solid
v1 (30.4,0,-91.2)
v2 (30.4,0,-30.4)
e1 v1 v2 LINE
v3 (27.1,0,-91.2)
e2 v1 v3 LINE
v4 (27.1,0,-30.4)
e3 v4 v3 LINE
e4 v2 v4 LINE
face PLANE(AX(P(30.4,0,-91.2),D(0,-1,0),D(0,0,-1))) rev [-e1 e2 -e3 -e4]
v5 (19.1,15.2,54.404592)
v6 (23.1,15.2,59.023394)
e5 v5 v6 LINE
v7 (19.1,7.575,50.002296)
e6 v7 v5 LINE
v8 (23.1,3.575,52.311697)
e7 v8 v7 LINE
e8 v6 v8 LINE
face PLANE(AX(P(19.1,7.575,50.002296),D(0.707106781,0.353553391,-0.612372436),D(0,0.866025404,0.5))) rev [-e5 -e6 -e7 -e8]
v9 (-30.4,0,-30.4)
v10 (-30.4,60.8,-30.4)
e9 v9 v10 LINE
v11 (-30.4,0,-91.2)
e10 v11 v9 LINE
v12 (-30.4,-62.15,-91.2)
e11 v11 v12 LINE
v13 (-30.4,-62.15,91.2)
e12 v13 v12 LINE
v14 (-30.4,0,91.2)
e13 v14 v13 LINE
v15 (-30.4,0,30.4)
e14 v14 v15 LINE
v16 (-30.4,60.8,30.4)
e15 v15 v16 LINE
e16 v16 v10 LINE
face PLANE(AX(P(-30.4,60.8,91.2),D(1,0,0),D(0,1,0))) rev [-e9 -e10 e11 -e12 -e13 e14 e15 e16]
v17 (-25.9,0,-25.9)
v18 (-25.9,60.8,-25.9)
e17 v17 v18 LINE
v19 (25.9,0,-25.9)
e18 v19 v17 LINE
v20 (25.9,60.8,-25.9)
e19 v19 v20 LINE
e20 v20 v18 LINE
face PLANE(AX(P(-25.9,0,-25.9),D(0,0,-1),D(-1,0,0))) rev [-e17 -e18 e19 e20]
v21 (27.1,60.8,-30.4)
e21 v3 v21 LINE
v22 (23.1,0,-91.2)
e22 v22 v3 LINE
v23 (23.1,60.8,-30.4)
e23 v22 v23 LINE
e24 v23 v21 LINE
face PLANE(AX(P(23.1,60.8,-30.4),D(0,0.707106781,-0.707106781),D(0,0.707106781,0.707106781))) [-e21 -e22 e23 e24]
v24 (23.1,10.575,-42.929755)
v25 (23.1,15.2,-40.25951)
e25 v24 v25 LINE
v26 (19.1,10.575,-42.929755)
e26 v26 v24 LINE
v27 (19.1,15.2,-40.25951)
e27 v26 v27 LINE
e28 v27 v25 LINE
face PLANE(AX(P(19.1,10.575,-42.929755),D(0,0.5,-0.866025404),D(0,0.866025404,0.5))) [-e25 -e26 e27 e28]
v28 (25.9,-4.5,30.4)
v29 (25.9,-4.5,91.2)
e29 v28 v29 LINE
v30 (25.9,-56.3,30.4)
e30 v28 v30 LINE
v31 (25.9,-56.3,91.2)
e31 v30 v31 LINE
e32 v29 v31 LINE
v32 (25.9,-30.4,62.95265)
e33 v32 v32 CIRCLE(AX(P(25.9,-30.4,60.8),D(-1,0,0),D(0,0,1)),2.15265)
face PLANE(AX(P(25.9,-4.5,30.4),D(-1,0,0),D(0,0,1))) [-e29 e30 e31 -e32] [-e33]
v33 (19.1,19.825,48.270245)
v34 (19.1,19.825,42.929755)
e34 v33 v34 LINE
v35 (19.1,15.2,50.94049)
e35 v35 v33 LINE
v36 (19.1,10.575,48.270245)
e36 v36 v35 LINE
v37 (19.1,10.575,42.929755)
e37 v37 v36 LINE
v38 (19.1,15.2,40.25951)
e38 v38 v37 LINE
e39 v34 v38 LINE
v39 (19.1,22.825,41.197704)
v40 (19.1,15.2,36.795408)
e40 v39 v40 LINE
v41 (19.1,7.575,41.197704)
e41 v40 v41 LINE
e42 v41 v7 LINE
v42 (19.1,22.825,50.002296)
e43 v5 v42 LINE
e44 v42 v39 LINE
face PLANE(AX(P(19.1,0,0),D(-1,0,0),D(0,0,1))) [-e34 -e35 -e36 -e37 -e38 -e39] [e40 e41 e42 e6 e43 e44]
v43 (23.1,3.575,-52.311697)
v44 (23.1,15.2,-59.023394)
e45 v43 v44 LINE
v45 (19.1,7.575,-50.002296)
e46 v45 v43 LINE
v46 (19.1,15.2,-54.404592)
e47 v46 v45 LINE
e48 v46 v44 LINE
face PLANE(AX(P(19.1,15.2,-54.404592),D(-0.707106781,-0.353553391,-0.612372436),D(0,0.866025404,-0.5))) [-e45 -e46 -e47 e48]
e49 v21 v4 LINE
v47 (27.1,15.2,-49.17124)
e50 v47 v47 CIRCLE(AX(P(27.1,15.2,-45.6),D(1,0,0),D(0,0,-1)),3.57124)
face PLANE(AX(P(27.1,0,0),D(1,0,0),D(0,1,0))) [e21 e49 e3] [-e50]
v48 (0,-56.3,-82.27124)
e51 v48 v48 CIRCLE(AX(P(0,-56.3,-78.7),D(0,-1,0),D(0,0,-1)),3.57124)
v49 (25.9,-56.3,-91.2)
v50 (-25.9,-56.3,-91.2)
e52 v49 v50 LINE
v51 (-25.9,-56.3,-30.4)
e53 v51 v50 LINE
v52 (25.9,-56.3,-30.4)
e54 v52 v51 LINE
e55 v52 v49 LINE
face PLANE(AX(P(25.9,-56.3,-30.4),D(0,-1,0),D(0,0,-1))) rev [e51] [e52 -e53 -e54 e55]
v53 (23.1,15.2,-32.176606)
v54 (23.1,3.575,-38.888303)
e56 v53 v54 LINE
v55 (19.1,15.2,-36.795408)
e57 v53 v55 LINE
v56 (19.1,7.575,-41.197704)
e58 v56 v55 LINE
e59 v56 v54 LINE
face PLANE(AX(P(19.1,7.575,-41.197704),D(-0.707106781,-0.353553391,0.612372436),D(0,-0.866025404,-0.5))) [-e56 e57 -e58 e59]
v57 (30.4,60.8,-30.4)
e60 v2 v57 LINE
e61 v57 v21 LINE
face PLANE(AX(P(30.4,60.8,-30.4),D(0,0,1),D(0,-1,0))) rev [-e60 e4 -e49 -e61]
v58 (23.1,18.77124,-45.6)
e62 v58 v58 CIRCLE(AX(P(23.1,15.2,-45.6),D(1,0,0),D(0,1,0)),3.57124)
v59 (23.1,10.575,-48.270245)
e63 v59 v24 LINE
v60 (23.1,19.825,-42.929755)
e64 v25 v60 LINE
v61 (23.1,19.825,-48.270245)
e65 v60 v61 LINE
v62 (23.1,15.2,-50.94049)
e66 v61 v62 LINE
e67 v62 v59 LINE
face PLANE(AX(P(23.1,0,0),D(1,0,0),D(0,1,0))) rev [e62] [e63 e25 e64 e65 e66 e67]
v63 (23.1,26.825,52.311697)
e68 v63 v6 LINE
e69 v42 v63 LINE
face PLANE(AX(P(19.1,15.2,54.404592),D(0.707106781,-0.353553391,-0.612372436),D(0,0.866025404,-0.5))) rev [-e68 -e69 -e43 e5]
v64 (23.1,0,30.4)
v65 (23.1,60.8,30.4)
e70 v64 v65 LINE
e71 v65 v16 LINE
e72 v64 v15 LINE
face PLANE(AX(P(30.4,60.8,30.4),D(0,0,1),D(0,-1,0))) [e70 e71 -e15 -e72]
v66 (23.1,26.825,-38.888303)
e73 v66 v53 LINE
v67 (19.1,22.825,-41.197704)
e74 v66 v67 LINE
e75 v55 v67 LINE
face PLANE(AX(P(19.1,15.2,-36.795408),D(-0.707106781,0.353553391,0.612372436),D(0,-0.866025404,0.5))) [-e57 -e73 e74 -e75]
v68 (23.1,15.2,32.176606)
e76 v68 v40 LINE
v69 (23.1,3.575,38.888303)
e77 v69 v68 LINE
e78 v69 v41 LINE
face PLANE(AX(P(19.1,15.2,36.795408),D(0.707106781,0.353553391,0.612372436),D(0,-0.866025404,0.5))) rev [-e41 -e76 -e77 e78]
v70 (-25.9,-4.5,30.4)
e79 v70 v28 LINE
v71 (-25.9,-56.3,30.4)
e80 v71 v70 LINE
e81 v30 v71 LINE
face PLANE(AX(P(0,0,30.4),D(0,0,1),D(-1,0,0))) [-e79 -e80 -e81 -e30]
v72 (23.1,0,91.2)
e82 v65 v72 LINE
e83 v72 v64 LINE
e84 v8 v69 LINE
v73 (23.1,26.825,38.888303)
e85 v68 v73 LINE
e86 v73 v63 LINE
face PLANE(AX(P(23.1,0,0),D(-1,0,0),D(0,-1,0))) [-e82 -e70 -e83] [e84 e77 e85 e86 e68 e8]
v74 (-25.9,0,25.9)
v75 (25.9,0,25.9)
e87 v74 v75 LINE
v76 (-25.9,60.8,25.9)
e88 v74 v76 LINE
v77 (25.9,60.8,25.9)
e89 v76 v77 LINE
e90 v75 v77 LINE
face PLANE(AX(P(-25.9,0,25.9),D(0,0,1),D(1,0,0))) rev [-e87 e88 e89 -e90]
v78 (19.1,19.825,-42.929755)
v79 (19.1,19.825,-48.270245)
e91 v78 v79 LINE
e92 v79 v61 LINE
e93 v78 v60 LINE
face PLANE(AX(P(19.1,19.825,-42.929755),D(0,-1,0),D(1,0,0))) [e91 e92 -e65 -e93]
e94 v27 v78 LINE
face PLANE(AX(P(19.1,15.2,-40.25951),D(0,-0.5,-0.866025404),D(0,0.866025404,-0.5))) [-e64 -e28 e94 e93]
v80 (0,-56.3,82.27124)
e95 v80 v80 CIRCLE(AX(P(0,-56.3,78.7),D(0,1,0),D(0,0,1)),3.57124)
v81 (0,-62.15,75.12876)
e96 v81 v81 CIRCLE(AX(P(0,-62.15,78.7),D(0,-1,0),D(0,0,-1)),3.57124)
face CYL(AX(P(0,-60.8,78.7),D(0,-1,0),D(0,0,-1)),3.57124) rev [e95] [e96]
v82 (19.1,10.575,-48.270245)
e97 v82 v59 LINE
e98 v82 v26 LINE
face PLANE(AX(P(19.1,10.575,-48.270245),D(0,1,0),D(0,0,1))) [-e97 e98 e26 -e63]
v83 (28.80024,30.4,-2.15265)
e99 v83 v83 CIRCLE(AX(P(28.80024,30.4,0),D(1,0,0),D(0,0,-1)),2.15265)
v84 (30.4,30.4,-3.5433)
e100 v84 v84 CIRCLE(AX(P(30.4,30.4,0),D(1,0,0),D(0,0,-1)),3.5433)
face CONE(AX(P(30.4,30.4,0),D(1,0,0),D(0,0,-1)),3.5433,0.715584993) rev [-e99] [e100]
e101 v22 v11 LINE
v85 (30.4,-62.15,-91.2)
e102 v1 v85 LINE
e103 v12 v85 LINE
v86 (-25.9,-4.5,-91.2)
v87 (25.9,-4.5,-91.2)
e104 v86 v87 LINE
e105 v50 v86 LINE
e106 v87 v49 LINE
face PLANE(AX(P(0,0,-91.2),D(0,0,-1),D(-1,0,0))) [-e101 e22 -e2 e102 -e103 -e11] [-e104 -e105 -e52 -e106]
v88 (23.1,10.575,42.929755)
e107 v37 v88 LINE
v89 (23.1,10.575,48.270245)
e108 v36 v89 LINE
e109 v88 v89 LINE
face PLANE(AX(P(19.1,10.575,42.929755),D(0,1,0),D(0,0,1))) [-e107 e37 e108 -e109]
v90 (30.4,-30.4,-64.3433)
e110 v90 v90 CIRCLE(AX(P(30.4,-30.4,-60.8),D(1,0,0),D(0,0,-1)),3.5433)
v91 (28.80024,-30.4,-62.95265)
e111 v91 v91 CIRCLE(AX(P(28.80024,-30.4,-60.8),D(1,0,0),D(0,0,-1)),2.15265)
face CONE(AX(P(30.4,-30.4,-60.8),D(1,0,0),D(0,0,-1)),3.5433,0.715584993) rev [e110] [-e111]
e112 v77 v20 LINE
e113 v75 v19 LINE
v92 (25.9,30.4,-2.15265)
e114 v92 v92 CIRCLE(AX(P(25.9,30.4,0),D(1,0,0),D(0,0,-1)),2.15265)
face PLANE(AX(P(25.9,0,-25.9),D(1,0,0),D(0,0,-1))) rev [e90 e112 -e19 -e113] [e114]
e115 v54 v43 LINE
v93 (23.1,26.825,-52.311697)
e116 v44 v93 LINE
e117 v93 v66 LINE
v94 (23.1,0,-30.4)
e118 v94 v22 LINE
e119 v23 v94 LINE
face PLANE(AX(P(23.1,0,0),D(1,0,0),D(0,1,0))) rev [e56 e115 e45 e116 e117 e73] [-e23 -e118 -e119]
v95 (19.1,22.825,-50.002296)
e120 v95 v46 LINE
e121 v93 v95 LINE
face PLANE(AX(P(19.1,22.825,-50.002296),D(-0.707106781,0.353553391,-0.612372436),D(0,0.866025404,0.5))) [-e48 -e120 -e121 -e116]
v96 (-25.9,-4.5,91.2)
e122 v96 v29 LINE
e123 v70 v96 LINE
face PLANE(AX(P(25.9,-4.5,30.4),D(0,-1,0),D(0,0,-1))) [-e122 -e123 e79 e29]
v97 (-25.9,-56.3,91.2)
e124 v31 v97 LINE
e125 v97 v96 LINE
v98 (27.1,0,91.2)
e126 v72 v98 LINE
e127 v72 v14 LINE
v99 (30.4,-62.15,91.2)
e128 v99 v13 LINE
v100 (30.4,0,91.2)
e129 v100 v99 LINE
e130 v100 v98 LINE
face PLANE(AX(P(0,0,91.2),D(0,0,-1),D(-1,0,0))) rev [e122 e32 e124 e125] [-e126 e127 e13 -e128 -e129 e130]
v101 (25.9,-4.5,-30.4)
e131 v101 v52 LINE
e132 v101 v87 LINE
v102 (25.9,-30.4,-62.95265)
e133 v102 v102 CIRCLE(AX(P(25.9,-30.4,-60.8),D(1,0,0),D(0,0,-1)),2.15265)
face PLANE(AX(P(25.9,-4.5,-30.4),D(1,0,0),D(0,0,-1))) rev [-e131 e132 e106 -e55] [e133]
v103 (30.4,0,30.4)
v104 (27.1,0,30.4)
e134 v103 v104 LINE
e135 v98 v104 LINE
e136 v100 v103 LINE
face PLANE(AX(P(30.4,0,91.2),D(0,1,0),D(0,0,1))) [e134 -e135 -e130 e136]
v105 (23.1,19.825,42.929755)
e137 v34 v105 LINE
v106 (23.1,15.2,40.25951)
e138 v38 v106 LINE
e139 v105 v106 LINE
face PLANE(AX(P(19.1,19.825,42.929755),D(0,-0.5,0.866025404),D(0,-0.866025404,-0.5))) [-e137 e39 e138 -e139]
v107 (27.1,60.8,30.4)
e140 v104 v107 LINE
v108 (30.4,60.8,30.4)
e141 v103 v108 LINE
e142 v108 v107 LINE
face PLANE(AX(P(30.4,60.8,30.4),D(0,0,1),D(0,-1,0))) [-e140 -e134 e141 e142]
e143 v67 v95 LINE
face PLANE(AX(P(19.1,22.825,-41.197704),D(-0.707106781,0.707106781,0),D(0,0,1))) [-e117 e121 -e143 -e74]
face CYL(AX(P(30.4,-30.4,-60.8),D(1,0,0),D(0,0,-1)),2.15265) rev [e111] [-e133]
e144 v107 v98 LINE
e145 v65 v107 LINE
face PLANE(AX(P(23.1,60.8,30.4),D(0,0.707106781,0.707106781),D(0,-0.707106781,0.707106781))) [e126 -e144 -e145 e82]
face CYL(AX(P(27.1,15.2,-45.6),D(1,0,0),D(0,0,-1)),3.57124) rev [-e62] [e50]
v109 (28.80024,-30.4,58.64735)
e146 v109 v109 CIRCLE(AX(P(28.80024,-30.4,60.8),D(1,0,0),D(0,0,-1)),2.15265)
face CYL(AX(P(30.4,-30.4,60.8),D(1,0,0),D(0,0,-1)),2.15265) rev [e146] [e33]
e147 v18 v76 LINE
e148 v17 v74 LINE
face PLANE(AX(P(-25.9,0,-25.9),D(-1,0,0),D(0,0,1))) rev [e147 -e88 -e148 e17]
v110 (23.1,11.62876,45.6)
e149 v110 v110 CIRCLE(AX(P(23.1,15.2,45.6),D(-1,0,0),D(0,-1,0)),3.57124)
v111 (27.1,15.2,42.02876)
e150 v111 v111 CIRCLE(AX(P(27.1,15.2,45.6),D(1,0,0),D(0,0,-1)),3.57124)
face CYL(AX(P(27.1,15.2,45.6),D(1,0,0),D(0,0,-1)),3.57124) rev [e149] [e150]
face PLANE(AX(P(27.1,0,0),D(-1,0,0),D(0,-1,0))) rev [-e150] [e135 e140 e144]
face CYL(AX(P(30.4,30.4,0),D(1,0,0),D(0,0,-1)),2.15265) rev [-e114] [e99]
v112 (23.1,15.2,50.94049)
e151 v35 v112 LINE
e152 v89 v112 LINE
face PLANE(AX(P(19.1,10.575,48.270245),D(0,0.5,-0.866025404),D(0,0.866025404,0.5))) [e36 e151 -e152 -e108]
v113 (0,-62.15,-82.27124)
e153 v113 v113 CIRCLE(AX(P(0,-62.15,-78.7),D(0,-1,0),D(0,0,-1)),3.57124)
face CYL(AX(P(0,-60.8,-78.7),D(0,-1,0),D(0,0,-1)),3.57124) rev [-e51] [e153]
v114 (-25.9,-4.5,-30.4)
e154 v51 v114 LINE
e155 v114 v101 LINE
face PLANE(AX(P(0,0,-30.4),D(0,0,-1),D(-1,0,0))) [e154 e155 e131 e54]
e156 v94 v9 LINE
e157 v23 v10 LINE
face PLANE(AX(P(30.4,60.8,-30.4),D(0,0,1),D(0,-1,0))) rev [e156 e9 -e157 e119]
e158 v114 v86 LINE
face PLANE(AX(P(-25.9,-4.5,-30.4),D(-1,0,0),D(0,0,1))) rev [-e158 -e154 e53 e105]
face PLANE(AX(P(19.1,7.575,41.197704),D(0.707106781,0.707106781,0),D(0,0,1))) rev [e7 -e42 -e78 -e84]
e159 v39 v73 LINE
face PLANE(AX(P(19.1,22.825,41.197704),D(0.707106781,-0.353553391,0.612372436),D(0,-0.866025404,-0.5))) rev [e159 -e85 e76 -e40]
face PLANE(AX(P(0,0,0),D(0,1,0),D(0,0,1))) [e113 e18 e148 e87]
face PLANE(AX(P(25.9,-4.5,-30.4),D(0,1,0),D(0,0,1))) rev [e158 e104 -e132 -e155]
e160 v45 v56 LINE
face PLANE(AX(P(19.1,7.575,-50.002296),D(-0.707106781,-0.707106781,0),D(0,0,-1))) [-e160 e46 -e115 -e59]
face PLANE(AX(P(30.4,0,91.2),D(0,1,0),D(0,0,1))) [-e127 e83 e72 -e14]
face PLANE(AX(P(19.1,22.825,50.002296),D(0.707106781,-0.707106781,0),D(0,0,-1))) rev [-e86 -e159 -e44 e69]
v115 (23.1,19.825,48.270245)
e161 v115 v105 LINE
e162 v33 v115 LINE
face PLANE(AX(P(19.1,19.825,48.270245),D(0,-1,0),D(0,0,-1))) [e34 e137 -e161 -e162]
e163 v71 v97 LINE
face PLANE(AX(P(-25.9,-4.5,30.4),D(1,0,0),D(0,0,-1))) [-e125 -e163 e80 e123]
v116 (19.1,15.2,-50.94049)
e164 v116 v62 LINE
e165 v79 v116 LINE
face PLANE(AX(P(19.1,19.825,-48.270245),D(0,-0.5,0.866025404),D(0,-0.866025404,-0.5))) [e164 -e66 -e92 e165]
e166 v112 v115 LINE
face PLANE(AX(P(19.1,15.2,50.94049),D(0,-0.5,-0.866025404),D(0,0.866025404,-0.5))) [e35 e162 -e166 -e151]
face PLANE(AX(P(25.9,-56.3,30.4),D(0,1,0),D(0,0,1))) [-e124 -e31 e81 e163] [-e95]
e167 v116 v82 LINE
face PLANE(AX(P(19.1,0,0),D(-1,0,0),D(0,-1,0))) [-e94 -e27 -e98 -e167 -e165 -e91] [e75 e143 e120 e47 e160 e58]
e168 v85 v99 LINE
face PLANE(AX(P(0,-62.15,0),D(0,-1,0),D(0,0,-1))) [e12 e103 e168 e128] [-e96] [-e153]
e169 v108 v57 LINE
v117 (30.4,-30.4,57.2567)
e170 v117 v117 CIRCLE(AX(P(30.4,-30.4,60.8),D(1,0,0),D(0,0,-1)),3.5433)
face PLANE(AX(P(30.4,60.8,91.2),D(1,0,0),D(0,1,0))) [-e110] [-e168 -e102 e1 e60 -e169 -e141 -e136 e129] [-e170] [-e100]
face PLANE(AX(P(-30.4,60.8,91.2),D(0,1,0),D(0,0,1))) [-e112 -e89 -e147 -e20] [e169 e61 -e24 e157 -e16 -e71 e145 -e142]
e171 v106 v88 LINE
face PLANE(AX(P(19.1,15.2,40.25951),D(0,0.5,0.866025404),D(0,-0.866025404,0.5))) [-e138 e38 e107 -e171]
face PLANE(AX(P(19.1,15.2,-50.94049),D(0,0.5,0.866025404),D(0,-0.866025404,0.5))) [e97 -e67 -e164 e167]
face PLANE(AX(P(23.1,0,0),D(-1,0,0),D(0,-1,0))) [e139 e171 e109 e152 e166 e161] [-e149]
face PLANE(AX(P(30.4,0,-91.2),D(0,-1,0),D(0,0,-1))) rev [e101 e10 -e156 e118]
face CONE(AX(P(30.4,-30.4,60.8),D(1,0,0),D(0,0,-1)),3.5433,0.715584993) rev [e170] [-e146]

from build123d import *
from build123d.topology import SkipClean

# Parameters (mm, degrees)
ESQUISSE1_W                                       = 60.8
ESQUISSE1_H                                       = 121.6
BOSS_EXTRU_1_DEPTH                                = 91.2
ESQUISSE2_W                                       = 60.8
ESQUISSE2_H                                       = 60.8
ENL_V_MAT_EXTRU_1_DEPTH                           = 126.342411019
ESQUISSE3_W                                       = 51.8
ESQUISSE3_H                                       = 51.8
ENL_V_MAT_EXTRU_2_DEPTH                           = 60.8
BOSS_EXTRU_3_DEPTH                                = 4
ESQUISSE6_W                                       = 51.8
ESQUISSE6_H                                       = 51.8
ENL_V_MAT_EXTRU_3_DEPTH                           = 60.8
D_GAGEMENT_1_43_D                                 = 7.14248
FRAISAGE_POUR_VIS_T_TE_FRAIS_E_BOMB_E_D           = 4.3053
FRAISAGE_POUR_VIS_T_TE_FRAIS_E_BOMB_E_DEPTH       = 4.5
FRAISAGE_POUR_VIS_T_TE_FRAIS_E_BOMB_E_CSINK_D     = 7.0866
FRAISAGE_POUR_VIS_T_TE_FRAIS_E_BOMB_E_CSINK_ANGLE = 82
D_GAGEMENT_1_42_D                                 = 7.14248
D_GAGEMENT_1_42_DEPTH                             = 20
BOSS_EXTRU_5_DEPTH                                = 4
CHANFREIN1_SIZE                                   = 4
ESQUISSE26_W                                      = 60.8
ESQUISSE26_H                                      = 182.4
ESQUISSE26_R                                      = 3.57124
BOSS_EXTRU_7_DEPTH                                = 1.35


with BuildPart() as part:
    # Esquisse1 → Boss.-Extru.1 (new, symmetric)
    with BuildSketch(Plane.XY):
        Rectangle(ESQUISSE1_W, ESQUISSE1_H)
    extrude(amount=BOSS_EXTRU_1_DEPTH, both=True)

    # Esquisse2 → Enlèv. mat.-Extru.1 (cut, through all)
    with BuildSketch(Plane.ZY.offset(30.4)):
        with Locations((-60.8, 30.4)):
            Rectangle(ESQUISSE2_W, ESQUISSE2_H)
    enl_v_mat_extru_1 = extrude(amount=-ENL_V_MAT_EXTRU_1_DEPTH, mode=Mode.SUBTRACT)

    # Esquisse3 → Enlèv. mat.-Extru.2 (cut)
    with BuildSketch(Plane(origin=(0, 0, -91.2), x_dir=(-1, 0, 0), z_dir=(0, 0, -1))):
        with Locations((0, -30.4)):
            Rectangle(ESQUISSE3_W, ESQUISSE3_H)
    enl_v_mat_extru_2 = extrude(amount=-ENL_V_MAT_EXTRU_2_DEPTH, mode=Mode.SUBTRACT)

    # Symétrie2: Enlèv. mat.-Extru.1, Enlèv. mat.-Extru.2 across plane
    add(enl_v_mat_extru_1.mirror(Plane.XY), mode=Mode.SUBTRACT)
    add(enl_v_mat_extru_2.mirror(Plane.XY), mode=Mode.SUBTRACT)

    # Esquisse10 → Boss.-Extru.3 (add)
    with BuildSketch(Plane(origin=(27.1, 0, 0), x_dir=(0, 0, -1), z_dir=(1, 0, 0))):
        Polygon((30.4, 60.8), (30.4, 0), (91.2, 0), align=None)
        Polygon((-30.4, 60.8), (-91.2, 0), (-30.4, 0), align=None)
    extrude(amount=-BOSS_EXTRU_3_DEPTH)

    # Esquisse6 → Enlèv. mat.-Extru.3 (cut)
    with BuildSketch(Plane(origin=(0, 60.8, 0), x_dir=(1, 0, 0), z_dir=(0, 1, 0))):
        Rectangle(ESQUISSE6_W, ESQUISSE6_H)
    extrude(amount=-ENL_V_MAT_EXTRU_3_DEPTH, mode=Mode.SUBTRACT)

    # Dégagement 1/43 (through all)
    with Locations(Plane(origin=(27.1, 0, 0), x_dir=(0, 0, -1), z_dir=(1, 0, 0))):
        with Locations((45.6, 15.2), (-45.6, 15.2)):
            Hole(D_GAGEMENT_1_43_D / 2)

    # Fraisage pour vis _ t_te frais_e bomb_e
    with Locations(Plane(origin=(30.4, 0, 0), x_dir=(0, 0, -1), z_dir=(1, 0, 0))):
        with Locations((-60.8, -30.4), (0, 30.4), (60.8, -30.4)):
            CounterSinkHole(FRAISAGE_POUR_VIS_T_TE_FRAIS_E_BOMB_E_D / 2, FRAISAGE_POUR_VIS_T_TE_FRAIS_E_BOMB_E_CSINK_D / 2, depth=FRAISAGE_POUR_VIS_T_TE_FRAIS_E_BOMB_E_DEPTH, counter_sink_angle=FRAISAGE_POUR_VIS_T_TE_FRAIS_E_BOMB_E_CSINK_ANGLE)

    # Dégagement 1/42
    with Locations(Plane(origin=(0, -60.8, 0), x_dir=(-1, 0, 0), z_dir=(0, -1, 0))):
        with Locations((0, 78.7), (0, -78.7)):
            Hole(D_GAGEMENT_1_42_D / 2, depth=D_GAGEMENT_1_42_DEPTH)

    # Esquisse23 → Boss.-Extru.5 (add)
    # profile 1 of 2: a face of its own
    with BuildSketch(Plane.ZY.offset(-23.1)):
        Polygon((-41.197704197, 22.825), (-50.002295803, 22.825), (-54.404591605, 15.2), (-50.002295803, 7.575), (-41.197704197, 7.575), (-36.795408395, 15.2), align=None)
        Polygon((-40.25951001, 15.2), (-42.929755005, 19.825), (-48.270244995, 19.825), (-50.94048999, 15.2), (-48.270244995, 10.575), (-42.929755005, 10.575), align=None, mode=Mode.SUBTRACT)
    # profile 2 of 2: a face of its own
    with BuildSketch(Plane.ZY.offset(-23.1)):
        Polygon((54.404591605, 15.2), (50.002295803, 22.825), (41.197704197, 22.825), (36.795408395, 15.2), (41.197704197, 7.575), (50.002295803, 7.575), align=None)
        Polygon((50.94048999, 15.2), (48.270244995, 19.825), (42.929755005, 19.825), (40.25951001, 15.2), (42.929755005, 10.575), (48.270244995, 10.575), align=None, mode=Mode.SUBTRACT)
    extrude(amount=BOSS_EXTRU_5_DEPTH)

    # Chanfrein1
    chanfrein1_edges = [part.edges().sort_by_distance(p)[0] for p in [
        (23.1, 19.0125, 38.996556296),
        (23.1, 11.3875, 38.996556296),
        (23.1, 7.575, 45.6),
        (23.1, 11.3875, 52.203443704),
        (23.1, 19.0125, 52.203443704),
        (23.1, 22.825, 45.6),
        (23.1, 11.3875, -38.996556296),
        (23.1, 19.0125, -38.996556296),
        (23.1, 7.575, -45.6),
        (23.1, 11.3875, -52.203443704),
        (23.1, 22.825, -45.6),
        (23.1, 19.0125, -52.203443704),
    ]]
    chamfer(chanfrein1_edges, length=CHANFREIN1_SIZE - 0.0001)  # a hair under: the kernel refuses the full size

    # Esquisse26 → Boss.-Extru.7 (add)
    with SkipClean():  # the faces are left unmerged after this step: merging them gives an invalid solid
        with BuildSketch(Plane.XZ.offset(60.8)):
            Rectangle(ESQUISSE26_W, ESQUISSE26_H)
            with Locations(Location((0, 78.7, 0), (0, 0, 270))):
                Circle(ESQUISSE26_R, mode=Mode.SUBTRACT)
            with Locations(Location((0, -78.7, 0), (0, 0, 270))):
                Circle(ESQUISSE26_R, mode=Mode.SUBTRACT)
        extrude(amount=BOSS_EXTRU_7_DEPTH)
    add(part.part.scale(1), mode=Mode.REPLACE)  # the faces are merged on a copy


solid = part.part
